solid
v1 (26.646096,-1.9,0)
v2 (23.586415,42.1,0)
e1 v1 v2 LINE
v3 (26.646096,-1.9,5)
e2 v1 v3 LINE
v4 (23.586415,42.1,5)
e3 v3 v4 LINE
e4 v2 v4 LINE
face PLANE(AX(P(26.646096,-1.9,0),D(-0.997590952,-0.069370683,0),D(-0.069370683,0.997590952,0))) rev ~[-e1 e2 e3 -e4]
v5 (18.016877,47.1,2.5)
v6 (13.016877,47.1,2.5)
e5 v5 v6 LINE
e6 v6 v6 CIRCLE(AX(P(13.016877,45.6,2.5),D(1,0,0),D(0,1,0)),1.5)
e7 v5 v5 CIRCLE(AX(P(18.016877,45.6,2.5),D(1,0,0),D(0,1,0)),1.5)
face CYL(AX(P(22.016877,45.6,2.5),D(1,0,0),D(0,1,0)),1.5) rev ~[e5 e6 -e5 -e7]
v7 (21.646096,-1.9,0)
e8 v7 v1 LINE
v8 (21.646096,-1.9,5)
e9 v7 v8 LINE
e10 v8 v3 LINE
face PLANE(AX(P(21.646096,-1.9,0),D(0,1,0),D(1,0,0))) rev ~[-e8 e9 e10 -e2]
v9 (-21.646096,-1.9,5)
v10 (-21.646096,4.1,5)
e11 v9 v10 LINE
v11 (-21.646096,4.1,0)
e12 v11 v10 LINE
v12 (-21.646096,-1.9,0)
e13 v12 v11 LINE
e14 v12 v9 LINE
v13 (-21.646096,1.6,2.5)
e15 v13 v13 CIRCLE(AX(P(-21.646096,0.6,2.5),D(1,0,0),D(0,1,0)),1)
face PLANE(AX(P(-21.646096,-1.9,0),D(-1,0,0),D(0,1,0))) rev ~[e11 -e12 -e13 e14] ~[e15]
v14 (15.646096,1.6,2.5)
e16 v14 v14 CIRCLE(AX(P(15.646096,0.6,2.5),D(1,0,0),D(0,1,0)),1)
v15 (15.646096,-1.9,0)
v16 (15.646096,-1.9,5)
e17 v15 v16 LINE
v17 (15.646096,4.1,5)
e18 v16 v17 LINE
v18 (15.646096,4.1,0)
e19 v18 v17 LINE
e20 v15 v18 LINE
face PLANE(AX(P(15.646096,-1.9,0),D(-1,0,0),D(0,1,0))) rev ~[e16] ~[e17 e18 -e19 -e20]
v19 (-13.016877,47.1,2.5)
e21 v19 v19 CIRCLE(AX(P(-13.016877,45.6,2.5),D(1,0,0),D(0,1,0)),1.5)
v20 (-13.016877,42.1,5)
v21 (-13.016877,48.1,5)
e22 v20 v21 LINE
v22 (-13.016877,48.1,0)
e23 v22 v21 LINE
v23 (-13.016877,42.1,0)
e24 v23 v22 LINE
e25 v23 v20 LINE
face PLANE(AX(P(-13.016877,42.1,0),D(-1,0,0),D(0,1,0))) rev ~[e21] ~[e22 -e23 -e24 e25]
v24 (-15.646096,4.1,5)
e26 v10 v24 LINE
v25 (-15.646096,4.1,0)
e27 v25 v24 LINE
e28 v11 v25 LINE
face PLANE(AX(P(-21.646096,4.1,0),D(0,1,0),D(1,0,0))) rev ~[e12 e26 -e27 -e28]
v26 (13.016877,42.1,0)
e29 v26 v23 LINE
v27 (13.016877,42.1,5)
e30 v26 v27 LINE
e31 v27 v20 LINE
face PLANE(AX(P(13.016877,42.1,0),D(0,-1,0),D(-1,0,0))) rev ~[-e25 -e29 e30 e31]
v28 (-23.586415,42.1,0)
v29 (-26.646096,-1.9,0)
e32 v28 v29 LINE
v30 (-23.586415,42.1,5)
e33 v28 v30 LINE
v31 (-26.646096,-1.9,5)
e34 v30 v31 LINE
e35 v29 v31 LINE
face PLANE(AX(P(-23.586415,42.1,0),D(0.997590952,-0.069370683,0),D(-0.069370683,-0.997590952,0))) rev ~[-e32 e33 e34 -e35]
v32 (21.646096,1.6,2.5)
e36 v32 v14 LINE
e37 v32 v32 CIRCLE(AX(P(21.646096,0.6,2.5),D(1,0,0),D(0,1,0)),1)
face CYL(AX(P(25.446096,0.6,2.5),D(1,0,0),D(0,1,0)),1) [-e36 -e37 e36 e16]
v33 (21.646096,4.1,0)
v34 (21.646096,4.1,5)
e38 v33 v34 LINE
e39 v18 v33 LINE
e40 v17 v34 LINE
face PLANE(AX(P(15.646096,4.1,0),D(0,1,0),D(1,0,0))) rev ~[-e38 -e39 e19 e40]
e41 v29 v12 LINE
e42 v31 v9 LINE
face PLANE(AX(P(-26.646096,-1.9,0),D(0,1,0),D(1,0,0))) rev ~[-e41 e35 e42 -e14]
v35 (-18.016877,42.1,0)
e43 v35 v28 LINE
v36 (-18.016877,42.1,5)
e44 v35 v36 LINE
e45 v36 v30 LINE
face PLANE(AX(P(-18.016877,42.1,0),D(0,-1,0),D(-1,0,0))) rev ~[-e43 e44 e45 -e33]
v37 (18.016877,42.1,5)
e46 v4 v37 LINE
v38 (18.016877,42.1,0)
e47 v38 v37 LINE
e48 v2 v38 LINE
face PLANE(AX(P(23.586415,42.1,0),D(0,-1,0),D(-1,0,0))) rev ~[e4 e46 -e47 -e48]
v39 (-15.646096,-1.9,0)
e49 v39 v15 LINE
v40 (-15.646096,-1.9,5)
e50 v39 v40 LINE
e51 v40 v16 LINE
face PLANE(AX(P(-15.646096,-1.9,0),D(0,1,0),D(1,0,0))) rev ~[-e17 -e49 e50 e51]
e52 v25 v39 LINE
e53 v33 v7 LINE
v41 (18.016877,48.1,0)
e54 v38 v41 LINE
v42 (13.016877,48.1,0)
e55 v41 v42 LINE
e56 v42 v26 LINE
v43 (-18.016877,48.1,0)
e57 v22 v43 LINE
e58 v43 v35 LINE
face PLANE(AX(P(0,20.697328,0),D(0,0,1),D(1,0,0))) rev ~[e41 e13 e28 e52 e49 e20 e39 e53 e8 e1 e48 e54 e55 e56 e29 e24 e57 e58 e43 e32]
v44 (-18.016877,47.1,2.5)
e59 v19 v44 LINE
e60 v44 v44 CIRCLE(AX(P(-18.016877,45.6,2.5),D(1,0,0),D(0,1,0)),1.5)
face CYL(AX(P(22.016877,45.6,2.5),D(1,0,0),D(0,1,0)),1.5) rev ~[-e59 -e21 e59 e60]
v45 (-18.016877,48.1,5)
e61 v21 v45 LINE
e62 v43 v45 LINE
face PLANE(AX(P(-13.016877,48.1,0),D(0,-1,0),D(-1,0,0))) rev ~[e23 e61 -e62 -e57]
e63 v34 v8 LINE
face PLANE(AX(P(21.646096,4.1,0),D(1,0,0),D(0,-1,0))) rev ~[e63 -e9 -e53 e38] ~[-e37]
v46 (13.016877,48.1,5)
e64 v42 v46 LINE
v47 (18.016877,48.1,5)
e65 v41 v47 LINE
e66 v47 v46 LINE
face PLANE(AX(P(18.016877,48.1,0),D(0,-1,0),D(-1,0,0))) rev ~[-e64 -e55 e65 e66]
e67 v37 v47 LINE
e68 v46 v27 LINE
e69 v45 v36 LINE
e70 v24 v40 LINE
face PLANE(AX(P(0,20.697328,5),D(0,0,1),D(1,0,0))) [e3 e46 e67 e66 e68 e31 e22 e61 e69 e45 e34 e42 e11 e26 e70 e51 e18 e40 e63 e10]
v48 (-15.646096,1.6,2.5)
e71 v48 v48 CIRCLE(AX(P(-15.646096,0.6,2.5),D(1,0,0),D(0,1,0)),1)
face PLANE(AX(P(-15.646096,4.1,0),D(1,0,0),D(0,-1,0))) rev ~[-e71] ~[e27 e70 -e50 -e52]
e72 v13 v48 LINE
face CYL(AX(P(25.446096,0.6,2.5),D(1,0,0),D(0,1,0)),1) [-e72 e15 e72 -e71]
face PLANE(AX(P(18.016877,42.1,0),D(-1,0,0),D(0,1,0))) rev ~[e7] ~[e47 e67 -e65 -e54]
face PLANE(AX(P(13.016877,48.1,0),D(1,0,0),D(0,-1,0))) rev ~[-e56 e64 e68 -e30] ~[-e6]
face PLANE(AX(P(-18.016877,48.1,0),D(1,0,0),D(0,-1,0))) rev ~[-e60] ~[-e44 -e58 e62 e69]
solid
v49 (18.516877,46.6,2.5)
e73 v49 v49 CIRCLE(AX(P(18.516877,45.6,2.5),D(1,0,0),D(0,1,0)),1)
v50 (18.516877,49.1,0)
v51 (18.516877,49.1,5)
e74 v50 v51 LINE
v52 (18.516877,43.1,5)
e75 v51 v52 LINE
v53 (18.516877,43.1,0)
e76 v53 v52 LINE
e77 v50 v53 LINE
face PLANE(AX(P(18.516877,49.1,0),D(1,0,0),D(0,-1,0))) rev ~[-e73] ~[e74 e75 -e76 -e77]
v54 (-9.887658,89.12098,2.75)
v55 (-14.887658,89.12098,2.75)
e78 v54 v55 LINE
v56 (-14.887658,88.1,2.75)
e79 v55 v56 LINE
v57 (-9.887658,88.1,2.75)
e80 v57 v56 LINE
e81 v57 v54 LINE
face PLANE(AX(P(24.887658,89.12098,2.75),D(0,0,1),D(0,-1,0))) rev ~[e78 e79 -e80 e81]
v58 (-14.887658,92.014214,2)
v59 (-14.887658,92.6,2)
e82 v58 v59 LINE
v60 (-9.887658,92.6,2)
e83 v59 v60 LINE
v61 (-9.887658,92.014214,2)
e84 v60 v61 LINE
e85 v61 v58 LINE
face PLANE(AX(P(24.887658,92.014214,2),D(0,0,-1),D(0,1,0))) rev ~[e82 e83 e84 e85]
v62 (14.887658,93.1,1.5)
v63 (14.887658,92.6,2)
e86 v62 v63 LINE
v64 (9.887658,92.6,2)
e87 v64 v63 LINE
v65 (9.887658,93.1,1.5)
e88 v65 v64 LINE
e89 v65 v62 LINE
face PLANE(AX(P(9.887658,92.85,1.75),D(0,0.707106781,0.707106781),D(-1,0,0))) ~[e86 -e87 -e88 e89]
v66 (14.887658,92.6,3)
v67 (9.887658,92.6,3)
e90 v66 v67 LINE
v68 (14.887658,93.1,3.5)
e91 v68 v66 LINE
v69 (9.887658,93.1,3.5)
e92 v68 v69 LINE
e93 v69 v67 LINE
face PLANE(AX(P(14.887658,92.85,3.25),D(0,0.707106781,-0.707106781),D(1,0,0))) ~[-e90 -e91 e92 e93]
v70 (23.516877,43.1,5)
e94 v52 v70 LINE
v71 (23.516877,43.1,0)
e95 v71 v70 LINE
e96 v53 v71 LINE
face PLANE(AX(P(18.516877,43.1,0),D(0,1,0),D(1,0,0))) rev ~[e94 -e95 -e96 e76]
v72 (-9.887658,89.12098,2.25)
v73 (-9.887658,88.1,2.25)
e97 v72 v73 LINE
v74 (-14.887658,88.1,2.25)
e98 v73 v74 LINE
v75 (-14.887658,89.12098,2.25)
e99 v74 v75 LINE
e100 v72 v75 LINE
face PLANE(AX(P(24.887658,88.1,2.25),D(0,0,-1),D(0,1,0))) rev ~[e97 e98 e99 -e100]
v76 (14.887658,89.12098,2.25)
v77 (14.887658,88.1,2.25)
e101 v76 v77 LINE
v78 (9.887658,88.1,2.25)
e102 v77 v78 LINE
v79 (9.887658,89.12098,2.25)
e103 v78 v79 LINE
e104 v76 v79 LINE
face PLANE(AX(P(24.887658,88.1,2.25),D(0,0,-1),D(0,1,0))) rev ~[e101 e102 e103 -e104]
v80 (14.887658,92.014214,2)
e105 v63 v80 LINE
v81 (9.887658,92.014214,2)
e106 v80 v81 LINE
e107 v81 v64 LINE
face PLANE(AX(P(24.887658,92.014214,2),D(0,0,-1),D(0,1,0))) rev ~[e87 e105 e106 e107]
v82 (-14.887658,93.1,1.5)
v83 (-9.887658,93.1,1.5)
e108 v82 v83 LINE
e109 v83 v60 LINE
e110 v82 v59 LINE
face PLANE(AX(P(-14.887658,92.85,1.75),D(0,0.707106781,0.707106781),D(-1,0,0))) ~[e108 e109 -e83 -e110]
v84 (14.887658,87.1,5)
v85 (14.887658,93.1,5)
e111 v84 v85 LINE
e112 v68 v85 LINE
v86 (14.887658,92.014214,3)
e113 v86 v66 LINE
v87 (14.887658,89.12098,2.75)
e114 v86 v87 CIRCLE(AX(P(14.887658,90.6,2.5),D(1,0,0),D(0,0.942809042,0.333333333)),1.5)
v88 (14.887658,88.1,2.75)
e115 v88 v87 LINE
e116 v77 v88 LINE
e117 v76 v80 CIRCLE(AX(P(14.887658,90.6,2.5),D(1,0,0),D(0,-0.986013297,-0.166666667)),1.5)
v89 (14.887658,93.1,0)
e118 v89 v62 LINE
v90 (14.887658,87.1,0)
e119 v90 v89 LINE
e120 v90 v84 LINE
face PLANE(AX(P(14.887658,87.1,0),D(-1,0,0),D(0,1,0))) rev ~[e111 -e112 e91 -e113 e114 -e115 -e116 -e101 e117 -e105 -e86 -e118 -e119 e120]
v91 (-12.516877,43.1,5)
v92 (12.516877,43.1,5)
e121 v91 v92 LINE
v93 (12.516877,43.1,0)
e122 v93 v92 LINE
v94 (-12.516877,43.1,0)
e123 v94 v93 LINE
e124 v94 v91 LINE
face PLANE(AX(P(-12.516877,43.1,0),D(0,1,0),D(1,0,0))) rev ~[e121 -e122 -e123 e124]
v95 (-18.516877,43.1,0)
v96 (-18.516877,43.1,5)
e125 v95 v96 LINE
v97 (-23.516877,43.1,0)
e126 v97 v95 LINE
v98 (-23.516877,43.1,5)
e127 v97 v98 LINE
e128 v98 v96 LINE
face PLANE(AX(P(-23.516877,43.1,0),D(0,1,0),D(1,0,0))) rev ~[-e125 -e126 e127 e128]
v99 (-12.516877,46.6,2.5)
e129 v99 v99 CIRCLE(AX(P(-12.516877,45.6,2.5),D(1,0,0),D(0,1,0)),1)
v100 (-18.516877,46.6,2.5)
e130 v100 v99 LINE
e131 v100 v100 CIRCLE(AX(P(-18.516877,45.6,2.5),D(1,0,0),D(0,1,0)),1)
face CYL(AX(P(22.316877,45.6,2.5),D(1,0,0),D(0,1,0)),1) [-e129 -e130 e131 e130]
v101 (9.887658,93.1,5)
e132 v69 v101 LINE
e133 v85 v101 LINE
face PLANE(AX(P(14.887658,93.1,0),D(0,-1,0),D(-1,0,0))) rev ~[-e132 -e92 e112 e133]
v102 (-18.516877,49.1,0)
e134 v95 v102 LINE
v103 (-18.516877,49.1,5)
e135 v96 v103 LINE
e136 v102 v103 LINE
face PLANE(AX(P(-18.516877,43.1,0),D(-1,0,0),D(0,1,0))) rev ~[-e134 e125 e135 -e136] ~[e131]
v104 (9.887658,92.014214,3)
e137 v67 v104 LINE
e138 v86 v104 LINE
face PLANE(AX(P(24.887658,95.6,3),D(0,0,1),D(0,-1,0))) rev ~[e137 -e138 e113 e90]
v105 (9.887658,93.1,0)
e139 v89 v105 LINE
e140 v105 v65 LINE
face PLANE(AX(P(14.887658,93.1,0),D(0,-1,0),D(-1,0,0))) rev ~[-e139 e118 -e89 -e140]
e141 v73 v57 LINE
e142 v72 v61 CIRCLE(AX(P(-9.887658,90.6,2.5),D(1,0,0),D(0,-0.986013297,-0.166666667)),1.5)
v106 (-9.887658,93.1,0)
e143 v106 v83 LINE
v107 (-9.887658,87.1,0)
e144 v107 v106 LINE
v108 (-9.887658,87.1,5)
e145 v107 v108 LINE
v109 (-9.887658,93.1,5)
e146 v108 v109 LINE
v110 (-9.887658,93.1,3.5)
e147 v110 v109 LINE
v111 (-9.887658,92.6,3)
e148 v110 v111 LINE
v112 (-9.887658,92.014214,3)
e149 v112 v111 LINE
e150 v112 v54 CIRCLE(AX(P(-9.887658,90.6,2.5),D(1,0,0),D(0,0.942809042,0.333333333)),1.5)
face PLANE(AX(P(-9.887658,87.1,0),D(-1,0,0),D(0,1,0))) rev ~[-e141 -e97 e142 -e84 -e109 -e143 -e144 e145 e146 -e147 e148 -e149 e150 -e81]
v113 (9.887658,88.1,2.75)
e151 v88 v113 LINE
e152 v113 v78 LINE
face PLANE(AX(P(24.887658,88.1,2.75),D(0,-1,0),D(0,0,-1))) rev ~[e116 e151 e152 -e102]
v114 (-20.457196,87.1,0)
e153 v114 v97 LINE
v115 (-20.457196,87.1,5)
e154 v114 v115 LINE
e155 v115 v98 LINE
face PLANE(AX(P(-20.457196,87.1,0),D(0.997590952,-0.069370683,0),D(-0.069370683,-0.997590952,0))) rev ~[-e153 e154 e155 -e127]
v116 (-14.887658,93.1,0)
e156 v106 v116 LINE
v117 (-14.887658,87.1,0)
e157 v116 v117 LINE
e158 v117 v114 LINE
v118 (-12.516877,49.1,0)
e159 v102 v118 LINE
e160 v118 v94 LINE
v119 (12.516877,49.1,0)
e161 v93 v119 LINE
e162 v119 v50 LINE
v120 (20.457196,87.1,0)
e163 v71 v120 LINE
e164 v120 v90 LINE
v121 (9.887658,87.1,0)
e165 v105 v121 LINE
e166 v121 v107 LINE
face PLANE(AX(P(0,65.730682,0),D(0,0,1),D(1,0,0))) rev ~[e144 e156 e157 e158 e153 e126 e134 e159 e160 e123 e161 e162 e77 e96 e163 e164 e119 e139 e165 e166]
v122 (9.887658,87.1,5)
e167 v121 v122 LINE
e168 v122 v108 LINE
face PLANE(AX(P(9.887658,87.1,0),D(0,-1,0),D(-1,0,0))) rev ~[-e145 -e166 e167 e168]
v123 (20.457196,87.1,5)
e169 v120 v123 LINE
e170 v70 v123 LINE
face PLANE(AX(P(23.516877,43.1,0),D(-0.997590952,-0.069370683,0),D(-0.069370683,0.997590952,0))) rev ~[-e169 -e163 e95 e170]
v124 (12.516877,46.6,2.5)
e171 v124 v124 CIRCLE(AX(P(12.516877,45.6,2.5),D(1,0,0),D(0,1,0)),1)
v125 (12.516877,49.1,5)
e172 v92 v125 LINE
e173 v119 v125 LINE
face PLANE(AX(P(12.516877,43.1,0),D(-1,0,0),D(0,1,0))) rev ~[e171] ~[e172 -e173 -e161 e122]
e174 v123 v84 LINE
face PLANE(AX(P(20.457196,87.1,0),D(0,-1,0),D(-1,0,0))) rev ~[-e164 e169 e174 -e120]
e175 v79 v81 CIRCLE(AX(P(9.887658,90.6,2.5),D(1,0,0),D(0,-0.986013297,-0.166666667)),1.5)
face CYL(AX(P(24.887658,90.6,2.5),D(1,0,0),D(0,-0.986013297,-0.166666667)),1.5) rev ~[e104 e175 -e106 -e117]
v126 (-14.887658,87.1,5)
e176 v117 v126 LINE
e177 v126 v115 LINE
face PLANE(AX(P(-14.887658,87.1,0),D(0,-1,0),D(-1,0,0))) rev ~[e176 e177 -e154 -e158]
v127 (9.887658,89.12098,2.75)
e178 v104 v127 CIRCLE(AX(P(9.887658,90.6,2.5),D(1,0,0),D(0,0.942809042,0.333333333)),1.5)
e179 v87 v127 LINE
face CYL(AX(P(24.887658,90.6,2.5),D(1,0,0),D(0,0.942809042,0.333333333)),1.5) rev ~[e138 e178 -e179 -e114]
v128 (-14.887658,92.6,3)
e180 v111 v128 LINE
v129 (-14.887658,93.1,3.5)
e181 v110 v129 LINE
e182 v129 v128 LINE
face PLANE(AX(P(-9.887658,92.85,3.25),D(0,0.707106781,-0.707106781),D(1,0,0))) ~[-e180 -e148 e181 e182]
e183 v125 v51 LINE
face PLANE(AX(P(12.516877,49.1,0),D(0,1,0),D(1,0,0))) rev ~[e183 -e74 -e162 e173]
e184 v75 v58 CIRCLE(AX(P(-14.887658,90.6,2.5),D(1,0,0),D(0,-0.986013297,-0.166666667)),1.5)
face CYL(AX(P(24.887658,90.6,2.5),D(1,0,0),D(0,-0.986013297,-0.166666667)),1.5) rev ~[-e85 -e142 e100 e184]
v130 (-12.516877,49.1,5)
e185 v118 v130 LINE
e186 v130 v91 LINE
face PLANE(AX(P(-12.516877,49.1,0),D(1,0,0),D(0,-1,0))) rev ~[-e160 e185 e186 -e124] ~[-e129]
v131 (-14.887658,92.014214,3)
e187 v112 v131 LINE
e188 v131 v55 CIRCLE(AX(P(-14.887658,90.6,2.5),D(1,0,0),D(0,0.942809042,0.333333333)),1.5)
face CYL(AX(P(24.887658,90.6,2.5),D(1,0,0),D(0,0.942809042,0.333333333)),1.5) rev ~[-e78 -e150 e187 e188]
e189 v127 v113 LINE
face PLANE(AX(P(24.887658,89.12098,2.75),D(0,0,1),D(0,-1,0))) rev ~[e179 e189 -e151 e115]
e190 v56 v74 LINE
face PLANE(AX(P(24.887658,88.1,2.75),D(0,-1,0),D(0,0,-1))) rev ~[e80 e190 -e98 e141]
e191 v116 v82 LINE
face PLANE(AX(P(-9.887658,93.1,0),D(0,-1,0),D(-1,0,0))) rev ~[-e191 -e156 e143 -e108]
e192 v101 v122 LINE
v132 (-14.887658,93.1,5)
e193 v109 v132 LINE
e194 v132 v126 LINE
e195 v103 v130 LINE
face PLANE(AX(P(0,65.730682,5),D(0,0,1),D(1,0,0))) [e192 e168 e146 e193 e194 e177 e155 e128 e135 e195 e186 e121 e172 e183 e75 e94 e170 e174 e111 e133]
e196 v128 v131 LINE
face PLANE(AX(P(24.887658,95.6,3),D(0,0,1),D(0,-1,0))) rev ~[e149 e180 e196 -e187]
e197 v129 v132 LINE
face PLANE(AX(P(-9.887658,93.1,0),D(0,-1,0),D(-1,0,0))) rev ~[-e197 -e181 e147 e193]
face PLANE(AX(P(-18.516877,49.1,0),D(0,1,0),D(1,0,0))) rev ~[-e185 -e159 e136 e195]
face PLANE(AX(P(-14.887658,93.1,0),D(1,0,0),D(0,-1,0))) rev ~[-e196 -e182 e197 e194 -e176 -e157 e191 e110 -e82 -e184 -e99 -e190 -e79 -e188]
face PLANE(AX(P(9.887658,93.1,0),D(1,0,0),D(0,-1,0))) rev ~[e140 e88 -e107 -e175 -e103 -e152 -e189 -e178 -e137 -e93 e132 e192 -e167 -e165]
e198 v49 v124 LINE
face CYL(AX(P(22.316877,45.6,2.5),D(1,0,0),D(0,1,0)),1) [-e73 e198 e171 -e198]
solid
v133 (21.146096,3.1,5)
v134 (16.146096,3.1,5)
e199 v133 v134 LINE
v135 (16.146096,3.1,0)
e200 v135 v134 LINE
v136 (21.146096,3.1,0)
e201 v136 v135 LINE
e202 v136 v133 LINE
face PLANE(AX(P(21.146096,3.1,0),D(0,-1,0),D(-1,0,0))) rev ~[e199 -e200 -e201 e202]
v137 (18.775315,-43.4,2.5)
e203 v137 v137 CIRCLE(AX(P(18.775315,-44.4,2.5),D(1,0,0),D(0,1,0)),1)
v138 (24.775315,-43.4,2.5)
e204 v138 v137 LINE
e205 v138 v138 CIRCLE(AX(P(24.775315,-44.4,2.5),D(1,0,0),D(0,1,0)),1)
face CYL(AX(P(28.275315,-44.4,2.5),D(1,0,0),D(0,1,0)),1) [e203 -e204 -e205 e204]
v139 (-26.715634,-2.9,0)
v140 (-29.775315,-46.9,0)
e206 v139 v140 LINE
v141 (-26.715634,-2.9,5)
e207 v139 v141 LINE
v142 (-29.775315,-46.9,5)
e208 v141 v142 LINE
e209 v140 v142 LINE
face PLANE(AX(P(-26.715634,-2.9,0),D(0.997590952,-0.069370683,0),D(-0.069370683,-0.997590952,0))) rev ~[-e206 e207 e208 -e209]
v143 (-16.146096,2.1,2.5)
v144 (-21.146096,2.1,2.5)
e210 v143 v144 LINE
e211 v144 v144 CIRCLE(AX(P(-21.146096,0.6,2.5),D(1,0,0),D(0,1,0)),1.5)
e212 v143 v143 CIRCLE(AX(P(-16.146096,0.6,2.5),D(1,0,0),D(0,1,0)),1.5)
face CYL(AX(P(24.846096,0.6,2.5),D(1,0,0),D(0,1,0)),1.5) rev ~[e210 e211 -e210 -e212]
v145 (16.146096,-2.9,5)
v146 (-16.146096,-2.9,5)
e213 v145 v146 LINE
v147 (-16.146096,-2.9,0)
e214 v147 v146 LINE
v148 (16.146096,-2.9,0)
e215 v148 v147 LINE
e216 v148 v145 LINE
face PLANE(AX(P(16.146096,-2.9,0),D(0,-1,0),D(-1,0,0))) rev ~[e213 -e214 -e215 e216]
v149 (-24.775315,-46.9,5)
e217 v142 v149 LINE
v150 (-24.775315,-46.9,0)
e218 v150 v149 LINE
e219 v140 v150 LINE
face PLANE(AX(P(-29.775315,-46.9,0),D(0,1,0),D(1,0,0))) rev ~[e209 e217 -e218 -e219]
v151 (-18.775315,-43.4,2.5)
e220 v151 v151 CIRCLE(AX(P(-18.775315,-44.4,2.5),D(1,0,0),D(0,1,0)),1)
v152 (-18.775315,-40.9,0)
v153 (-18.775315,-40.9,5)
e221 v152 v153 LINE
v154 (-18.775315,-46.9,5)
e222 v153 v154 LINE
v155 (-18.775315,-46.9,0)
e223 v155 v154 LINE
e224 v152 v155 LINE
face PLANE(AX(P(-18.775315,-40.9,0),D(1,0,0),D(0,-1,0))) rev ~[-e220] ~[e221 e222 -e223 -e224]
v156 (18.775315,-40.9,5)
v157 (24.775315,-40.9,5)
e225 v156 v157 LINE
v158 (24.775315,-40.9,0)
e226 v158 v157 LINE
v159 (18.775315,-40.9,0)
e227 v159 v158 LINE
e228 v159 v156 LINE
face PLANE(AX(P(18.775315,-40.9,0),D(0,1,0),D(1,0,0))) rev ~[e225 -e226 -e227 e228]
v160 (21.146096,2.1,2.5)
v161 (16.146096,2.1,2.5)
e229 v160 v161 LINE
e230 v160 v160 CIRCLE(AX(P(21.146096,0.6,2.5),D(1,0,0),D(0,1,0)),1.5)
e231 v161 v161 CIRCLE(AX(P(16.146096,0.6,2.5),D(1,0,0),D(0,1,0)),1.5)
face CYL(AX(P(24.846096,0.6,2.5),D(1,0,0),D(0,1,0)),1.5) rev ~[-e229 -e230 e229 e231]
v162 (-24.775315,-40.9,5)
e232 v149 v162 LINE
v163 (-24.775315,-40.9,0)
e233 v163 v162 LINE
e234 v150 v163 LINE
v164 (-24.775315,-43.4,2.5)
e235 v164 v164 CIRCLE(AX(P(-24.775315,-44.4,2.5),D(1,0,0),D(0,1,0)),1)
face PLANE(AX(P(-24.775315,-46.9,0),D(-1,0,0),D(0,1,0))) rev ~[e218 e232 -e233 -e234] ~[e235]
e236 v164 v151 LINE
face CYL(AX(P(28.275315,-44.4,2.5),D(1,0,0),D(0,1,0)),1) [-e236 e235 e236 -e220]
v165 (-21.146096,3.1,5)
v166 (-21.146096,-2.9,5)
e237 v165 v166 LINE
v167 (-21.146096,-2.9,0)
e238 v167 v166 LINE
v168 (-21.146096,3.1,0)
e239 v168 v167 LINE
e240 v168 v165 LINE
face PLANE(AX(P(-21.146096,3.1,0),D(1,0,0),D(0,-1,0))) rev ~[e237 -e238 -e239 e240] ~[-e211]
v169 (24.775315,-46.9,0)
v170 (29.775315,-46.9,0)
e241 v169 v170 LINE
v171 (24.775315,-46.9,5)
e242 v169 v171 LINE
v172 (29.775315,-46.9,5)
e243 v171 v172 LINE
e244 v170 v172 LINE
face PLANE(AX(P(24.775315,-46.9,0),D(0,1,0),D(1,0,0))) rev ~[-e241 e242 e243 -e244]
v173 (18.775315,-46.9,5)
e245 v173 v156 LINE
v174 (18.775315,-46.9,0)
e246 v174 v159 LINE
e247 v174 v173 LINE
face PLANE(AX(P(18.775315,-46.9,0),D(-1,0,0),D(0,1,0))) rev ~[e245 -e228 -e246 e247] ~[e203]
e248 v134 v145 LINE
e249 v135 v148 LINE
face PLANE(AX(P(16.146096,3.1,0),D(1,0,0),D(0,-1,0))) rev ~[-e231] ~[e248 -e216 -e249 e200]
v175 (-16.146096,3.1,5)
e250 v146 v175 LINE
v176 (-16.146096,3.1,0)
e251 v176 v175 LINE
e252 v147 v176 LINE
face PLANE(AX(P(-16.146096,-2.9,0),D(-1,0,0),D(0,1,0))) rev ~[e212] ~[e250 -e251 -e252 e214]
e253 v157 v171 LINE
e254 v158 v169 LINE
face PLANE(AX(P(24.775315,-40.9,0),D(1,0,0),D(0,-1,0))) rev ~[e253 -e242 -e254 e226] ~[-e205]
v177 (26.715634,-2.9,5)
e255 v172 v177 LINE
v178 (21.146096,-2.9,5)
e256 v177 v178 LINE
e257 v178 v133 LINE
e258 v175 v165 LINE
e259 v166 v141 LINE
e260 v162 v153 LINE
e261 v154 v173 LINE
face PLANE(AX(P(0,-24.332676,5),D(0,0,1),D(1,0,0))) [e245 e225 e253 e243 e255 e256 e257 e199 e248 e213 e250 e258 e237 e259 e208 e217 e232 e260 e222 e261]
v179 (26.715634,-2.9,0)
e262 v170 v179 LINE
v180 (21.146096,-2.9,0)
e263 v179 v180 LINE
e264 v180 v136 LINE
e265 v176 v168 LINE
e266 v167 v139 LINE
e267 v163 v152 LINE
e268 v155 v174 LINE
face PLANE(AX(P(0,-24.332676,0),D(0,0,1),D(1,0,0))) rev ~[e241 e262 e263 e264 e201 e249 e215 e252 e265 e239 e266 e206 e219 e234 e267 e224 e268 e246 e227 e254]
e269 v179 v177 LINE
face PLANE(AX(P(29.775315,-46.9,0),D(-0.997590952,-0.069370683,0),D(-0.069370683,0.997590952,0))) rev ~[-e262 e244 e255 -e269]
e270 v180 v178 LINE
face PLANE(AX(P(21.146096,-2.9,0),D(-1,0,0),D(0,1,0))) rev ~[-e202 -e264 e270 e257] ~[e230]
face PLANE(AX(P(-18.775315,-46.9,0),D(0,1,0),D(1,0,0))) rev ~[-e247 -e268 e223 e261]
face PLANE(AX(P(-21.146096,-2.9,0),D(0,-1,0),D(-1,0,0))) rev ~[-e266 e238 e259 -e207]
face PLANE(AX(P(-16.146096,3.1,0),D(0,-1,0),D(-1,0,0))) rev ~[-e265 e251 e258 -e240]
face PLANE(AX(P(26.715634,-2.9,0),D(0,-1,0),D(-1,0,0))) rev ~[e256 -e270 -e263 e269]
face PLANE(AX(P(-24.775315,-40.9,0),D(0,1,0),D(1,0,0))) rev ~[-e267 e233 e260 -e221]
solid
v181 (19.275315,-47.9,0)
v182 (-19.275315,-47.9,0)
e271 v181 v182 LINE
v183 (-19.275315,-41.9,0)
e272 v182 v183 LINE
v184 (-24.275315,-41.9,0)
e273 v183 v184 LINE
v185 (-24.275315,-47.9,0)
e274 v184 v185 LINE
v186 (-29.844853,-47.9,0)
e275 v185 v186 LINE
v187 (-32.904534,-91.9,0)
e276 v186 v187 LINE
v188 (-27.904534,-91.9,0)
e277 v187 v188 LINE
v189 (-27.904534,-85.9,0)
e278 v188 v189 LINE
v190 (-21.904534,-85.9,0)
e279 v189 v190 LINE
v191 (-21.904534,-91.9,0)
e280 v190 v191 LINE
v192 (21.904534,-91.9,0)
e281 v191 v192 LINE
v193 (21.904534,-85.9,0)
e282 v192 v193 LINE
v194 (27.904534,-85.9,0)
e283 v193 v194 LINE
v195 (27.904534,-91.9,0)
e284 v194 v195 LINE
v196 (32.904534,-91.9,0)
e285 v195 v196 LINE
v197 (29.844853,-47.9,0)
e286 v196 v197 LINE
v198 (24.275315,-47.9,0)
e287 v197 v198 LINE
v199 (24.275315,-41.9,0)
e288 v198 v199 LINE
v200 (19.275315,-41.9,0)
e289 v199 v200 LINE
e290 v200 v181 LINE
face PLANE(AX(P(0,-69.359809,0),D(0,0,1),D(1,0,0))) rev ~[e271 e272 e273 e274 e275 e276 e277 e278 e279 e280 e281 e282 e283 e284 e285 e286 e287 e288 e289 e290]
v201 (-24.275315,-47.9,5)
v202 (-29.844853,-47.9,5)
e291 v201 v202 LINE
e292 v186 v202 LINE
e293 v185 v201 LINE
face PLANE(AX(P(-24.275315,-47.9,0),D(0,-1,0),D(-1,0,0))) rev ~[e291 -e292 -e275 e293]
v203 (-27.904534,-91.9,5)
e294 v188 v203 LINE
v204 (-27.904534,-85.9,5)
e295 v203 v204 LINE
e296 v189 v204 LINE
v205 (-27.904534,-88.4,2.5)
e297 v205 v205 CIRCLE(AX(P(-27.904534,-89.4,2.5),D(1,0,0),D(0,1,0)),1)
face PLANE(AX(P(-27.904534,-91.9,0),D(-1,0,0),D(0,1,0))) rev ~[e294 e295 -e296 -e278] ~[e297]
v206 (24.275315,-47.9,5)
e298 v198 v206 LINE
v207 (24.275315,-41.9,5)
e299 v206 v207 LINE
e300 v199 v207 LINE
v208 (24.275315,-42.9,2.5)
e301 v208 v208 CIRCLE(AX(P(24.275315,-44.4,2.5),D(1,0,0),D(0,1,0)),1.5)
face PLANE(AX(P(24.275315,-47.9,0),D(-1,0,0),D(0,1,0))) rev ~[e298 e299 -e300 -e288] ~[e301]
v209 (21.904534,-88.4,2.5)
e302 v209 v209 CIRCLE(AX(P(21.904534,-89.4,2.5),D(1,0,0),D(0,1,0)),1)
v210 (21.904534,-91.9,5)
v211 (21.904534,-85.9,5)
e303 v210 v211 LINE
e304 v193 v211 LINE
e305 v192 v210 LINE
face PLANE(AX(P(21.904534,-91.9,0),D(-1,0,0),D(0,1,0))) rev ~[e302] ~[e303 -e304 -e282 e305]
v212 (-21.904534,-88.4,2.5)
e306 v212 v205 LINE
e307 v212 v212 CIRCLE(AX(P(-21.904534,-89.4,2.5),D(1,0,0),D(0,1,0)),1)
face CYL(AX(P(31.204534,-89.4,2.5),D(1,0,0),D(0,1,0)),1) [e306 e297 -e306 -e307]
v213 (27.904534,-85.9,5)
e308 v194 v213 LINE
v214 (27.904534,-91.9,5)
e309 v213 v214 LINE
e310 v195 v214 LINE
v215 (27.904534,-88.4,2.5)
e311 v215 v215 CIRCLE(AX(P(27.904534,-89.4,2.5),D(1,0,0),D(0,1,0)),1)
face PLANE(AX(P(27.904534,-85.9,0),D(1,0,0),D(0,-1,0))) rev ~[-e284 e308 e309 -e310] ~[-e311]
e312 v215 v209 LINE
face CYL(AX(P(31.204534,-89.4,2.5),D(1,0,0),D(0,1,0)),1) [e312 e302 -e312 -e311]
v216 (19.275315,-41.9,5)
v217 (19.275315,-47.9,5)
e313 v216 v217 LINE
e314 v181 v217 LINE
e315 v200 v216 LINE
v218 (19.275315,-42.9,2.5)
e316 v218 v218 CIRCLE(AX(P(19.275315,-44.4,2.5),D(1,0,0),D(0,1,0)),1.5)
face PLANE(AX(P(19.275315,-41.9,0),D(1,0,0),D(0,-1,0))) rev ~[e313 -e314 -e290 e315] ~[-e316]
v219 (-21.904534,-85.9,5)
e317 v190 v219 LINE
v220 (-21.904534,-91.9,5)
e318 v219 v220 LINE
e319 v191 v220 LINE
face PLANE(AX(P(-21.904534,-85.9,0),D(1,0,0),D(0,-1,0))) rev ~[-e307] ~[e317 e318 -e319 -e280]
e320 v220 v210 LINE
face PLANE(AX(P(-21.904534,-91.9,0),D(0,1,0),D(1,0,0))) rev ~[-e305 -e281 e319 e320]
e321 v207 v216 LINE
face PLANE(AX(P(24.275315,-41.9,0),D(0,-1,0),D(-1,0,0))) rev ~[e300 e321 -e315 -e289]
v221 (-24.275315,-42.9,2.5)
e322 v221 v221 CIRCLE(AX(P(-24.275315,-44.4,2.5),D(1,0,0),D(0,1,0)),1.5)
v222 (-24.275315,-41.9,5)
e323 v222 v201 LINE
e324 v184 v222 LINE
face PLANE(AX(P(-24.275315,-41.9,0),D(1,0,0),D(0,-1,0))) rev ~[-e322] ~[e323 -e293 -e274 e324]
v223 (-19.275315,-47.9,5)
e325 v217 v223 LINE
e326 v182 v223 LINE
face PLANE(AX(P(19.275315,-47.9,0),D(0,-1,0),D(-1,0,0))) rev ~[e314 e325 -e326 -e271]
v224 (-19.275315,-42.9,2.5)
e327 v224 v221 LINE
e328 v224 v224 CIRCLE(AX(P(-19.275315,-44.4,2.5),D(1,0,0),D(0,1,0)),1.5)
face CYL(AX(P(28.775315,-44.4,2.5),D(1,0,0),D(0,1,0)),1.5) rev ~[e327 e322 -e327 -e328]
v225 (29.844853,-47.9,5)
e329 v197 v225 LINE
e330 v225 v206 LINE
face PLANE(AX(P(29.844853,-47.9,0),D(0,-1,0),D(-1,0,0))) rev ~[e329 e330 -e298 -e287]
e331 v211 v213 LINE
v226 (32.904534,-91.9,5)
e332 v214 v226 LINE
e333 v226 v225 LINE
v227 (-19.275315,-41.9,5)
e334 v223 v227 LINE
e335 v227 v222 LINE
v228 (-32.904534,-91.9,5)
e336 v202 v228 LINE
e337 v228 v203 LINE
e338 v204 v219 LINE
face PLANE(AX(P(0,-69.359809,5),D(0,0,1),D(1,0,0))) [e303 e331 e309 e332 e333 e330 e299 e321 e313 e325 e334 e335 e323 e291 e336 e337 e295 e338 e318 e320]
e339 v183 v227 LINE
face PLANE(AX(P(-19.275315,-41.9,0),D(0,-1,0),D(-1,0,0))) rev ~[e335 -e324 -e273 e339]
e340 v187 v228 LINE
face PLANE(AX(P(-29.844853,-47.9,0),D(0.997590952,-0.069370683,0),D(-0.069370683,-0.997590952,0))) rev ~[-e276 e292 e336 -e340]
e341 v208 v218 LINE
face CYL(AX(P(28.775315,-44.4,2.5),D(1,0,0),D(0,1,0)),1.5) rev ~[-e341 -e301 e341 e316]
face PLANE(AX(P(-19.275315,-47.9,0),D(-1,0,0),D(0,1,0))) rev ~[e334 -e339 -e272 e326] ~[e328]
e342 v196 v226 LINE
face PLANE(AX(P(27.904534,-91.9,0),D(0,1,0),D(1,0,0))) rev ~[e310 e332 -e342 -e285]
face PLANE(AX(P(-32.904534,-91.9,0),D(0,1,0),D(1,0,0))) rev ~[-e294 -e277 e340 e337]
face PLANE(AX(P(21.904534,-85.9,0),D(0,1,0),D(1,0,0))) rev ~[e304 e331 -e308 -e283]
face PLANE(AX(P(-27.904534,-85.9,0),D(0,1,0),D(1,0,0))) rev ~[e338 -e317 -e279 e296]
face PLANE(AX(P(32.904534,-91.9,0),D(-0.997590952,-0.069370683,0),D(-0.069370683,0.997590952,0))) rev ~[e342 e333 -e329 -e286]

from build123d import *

# Parameters (mm, degrees)
F1_DEPTH  = 5
F12_START = -5.7
F10_R     = 1
F12_DEPTH = 62
F13_START = -5.5
F9_R      = 1.5
F9_R_2    = 1
F13_DEPTH = 55.3
F14_START = -6
F14_DEPTH = 56.6
F15_START = -6.3
F8_R      = 1.5
F8_R_2    = 1
F15_DEPTH = 49.5
F16_START = -5.7
F16_DEPTH = 49
F17_START = -6
F7_R      = 1.5
F7_R_2    = 1
F17_DEPTH = 43.6
F18_START = -5.7
F18_DEPTH = 42.3
F19_DEPTH = 45.5
F20_SIZE  = 0.5


with BuildPart() as f1:
    # F0 (on Top) → F1 (new body)
    with BuildSketch(Plane.XY):
        Polygon((-20.4571957112, 87.1), (-23.5168766766, 43.1), (-18.5168766766, 43.1), (-18.5168766766, 49.1), (-12.5168766766, 49.1), (-12.5168766766, 43.1), (12.5168766766, 43.1), (12.5168766766, 49.1), (18.5168766766, 49.1), (18.5168766766, 43.1), (23.5168766766, 43.1), (20.4571957112, 87.1), (14.8876575074, 87.1), (14.8876575074, 93.1), (9.8876575074, 93.1), (9.8876575074, 87.1), (-9.8876575074, 87.1), (-9.8876575074, 93.1), (-14.8876575074, 93.1), (-14.8876575074, 87.1), align=None)
    extrude(amount=F1_DEPTH)



with BuildPart() as f1b:
    # F0 (on Top) → F1, piece 2 (new body)
    with BuildSketch(Plane.XY):
        Polygon((-23.5864148803, 42.1), (-26.6460958457, -1.9), (-21.6460958457, -1.9), (-21.6460958457, 4.1), (-15.6460958457, 4.1), (-15.6460958457, -1.9), (15.6460958457, -1.9), (15.6460958457, 4.1), (21.6460958457, 4.1), (21.6460958457, -1.9), (26.6460958457, -1.9), (23.5864148803, 42.1), (18.0168766766, 42.1), (18.0168766766, 48.1), (13.0168766766, 48.1), (13.0168766766, 42.1), (-13.0168766766, 42.1), (-13.0168766766, 48.1), (-18.0168766766, 48.1), (-18.0168766766, 42.1), align=None)
    extrude(amount=F1_DEPTH)



with BuildPart() as f1c:
    # F0 (on Top) → F1, piece 3 (new body)
    with BuildSketch(Plane.XY):
        Polygon((-26.7156340495, -2.9), (-29.7753150149, -46.9), (-24.7753150149, -46.9), (-24.7753150149, -40.9), (-18.7753150149, -40.9), (-18.7753150149, -46.9), (18.7753150149, -46.9), (18.7753150149, -40.9), (24.7753150149, -40.9), (24.7753150149, -46.9), (29.7753150149, -46.9), (26.7156340495, -2.9), (21.1460958457, -2.9), (21.1460958457, 3.1), (16.1460958457, 3.1), (16.1460958457, -2.9), (-16.1460958457, -2.9), (-16.1460958457, 3.1), (-21.1460958457, 3.1), (-21.1460958457, -2.9), align=None)
    extrude(amount=F1_DEPTH)



with BuildPart() as f1d:
    # F0 (on Top) → F1, piece 4 (new body)
    with BuildSketch(Plane.XY):
        Polygon((-29.8448532186, -47.9), (-32.904534184, -91.9), (-27.904534184, -91.9), (-27.904534184, -85.9), (-21.904534184, -85.9), (-21.904534184, -91.9), (21.904534184, -91.9), (21.904534184, -85.9), (27.904534184, -85.9), (27.904534184, -91.9), (32.904534184, -91.9), (29.8448532186, -47.9), (24.2753150149, -47.9), (24.2753150149, -41.9), (19.2753150149, -41.9), (19.2753150149, -47.9), (-19.2753150149, -47.9), (-19.2753150149, -41.9), (-24.2753150149, -41.9), (-24.2753150149, -47.9), align=None)
    extrude(amount=F1_DEPTH)

    # F10 (on offset) → F12 (join)
    with BuildSketch(Plane.YZ.offset(36.904534184).offset(F12_START)):
        with Locations((-89.4, 2.5)):
            Circle(F10_R)
    extrude(amount=-F12_DEPTH)

    # F9 (on offset) → F13 (cut)
    with BuildSketch(Plane.YZ.offset(34.2753150149).offset(F13_START)):
        with Locations((-44.4, 2.5)):
            Circle(F9_R)
        with Locations((-44.4, 2.5)):
            Circle(F9_R_2, mode=Mode.SUBTRACT)
    extrude(amount=-F13_DEPTH, mode=Mode.SUBTRACT)


with BuildPart() as f1c_1:
    add(f1c.part)

    add(f1d.part)  # F14 merges F1d
    # F9 (on offset) → F14 (join)
    with BuildSketch(Plane.YZ.offset(34.2753150149).offset(F14_START)):
        with Locations((-44.4, 2.5)):
            Circle(F9_R_2)
    extrude(amount=-F14_DEPTH)

    # F8 (on offset) → F15 (cut)
    with BuildSketch(Plane.YZ.offset(31.1460958457).offset(F15_START)):
        with Locations((0.6, 2.5)):
            Circle(F8_R)
        with Locations((0.6, 2.5)):
            Circle(F8_R_2, mode=Mode.SUBTRACT)
    extrude(amount=-F15_DEPTH, mode=Mode.SUBTRACT)


with BuildPart() as f1b_1:
    add(f1b.part)

    add(f1c_1.part)  # F16 merges F1c
    # F8 (on offset) → F16 (join)
    with BuildSketch(Plane.YZ.offset(31.1460958457).offset(F16_START)):
        with Locations((0.6, 2.5)):
            Circle(F8_R_2)
    extrude(amount=-F16_DEPTH)

    # F7 (on offset) → F17 (cut)
    with BuildSketch(Plane.YZ.offset(28.0168766766).offset(F17_START)):
        with Locations((45.6, 2.5)):
            Circle(F7_R)
        with Locations((45.6, 2.5)):
            Circle(F7_R_2, mode=Mode.SUBTRACT)
    extrude(amount=-F17_DEPTH, mode=Mode.SUBTRACT)


with BuildPart() as f1_1:
    add(f1.part)

    add(f1b_1.part)  # F18 merges F1b
    # F7 (on offset) → F18 (join)
    with BuildSketch(Plane.YZ.offset(28.0168766766).offset(F18_START)):
        with Locations((45.6, 2.5)):
            Circle(F7_R_2)
    extrude(amount=-F18_DEPTH)

    # F11 (on offset) → F19 (cut)
    with BuildSketch(Plane.YZ.offset(24.8876575074)):
        with BuildLine():
            Line((95.6, 3), (92.0142135624, 3))
            ThreePointArc((92.0142135624, 3), (90.4708684127, 3.9944313411), (89.1209800542, 2.75))
            Line((89.1209800542, 2.75), (88.1, 2.75))
            Line((88.1, 2.75), (88.1, 2.25))
            Line((88.1, 2.25), (89.1209800542, 2.25))
            ThreePointArc((89.1209800542, 2.25), (90.4708684127, 1.0055686589), (92.0142135624, 2))
            Line((92.0142135624, 2), (95.6, 2))
            Line((95.6, 2), (95.6, 3))
        make_face()
    extrude(amount=-F19_DEPTH, mode=Mode.SUBTRACT)

    # F20
    f20_edges = [f1_1.edges().sort_by_distance(p)[0] for p in [
        (-12.387658, 93.1, 3),
        (-12.387658, 93.1, 2),
        (12.387658, 93.1, 3),
        (12.387658, 93.1, 2),
    ]]
    chamfer(f20_edges, length=F20_SIZE)


solid = f1_1.part
